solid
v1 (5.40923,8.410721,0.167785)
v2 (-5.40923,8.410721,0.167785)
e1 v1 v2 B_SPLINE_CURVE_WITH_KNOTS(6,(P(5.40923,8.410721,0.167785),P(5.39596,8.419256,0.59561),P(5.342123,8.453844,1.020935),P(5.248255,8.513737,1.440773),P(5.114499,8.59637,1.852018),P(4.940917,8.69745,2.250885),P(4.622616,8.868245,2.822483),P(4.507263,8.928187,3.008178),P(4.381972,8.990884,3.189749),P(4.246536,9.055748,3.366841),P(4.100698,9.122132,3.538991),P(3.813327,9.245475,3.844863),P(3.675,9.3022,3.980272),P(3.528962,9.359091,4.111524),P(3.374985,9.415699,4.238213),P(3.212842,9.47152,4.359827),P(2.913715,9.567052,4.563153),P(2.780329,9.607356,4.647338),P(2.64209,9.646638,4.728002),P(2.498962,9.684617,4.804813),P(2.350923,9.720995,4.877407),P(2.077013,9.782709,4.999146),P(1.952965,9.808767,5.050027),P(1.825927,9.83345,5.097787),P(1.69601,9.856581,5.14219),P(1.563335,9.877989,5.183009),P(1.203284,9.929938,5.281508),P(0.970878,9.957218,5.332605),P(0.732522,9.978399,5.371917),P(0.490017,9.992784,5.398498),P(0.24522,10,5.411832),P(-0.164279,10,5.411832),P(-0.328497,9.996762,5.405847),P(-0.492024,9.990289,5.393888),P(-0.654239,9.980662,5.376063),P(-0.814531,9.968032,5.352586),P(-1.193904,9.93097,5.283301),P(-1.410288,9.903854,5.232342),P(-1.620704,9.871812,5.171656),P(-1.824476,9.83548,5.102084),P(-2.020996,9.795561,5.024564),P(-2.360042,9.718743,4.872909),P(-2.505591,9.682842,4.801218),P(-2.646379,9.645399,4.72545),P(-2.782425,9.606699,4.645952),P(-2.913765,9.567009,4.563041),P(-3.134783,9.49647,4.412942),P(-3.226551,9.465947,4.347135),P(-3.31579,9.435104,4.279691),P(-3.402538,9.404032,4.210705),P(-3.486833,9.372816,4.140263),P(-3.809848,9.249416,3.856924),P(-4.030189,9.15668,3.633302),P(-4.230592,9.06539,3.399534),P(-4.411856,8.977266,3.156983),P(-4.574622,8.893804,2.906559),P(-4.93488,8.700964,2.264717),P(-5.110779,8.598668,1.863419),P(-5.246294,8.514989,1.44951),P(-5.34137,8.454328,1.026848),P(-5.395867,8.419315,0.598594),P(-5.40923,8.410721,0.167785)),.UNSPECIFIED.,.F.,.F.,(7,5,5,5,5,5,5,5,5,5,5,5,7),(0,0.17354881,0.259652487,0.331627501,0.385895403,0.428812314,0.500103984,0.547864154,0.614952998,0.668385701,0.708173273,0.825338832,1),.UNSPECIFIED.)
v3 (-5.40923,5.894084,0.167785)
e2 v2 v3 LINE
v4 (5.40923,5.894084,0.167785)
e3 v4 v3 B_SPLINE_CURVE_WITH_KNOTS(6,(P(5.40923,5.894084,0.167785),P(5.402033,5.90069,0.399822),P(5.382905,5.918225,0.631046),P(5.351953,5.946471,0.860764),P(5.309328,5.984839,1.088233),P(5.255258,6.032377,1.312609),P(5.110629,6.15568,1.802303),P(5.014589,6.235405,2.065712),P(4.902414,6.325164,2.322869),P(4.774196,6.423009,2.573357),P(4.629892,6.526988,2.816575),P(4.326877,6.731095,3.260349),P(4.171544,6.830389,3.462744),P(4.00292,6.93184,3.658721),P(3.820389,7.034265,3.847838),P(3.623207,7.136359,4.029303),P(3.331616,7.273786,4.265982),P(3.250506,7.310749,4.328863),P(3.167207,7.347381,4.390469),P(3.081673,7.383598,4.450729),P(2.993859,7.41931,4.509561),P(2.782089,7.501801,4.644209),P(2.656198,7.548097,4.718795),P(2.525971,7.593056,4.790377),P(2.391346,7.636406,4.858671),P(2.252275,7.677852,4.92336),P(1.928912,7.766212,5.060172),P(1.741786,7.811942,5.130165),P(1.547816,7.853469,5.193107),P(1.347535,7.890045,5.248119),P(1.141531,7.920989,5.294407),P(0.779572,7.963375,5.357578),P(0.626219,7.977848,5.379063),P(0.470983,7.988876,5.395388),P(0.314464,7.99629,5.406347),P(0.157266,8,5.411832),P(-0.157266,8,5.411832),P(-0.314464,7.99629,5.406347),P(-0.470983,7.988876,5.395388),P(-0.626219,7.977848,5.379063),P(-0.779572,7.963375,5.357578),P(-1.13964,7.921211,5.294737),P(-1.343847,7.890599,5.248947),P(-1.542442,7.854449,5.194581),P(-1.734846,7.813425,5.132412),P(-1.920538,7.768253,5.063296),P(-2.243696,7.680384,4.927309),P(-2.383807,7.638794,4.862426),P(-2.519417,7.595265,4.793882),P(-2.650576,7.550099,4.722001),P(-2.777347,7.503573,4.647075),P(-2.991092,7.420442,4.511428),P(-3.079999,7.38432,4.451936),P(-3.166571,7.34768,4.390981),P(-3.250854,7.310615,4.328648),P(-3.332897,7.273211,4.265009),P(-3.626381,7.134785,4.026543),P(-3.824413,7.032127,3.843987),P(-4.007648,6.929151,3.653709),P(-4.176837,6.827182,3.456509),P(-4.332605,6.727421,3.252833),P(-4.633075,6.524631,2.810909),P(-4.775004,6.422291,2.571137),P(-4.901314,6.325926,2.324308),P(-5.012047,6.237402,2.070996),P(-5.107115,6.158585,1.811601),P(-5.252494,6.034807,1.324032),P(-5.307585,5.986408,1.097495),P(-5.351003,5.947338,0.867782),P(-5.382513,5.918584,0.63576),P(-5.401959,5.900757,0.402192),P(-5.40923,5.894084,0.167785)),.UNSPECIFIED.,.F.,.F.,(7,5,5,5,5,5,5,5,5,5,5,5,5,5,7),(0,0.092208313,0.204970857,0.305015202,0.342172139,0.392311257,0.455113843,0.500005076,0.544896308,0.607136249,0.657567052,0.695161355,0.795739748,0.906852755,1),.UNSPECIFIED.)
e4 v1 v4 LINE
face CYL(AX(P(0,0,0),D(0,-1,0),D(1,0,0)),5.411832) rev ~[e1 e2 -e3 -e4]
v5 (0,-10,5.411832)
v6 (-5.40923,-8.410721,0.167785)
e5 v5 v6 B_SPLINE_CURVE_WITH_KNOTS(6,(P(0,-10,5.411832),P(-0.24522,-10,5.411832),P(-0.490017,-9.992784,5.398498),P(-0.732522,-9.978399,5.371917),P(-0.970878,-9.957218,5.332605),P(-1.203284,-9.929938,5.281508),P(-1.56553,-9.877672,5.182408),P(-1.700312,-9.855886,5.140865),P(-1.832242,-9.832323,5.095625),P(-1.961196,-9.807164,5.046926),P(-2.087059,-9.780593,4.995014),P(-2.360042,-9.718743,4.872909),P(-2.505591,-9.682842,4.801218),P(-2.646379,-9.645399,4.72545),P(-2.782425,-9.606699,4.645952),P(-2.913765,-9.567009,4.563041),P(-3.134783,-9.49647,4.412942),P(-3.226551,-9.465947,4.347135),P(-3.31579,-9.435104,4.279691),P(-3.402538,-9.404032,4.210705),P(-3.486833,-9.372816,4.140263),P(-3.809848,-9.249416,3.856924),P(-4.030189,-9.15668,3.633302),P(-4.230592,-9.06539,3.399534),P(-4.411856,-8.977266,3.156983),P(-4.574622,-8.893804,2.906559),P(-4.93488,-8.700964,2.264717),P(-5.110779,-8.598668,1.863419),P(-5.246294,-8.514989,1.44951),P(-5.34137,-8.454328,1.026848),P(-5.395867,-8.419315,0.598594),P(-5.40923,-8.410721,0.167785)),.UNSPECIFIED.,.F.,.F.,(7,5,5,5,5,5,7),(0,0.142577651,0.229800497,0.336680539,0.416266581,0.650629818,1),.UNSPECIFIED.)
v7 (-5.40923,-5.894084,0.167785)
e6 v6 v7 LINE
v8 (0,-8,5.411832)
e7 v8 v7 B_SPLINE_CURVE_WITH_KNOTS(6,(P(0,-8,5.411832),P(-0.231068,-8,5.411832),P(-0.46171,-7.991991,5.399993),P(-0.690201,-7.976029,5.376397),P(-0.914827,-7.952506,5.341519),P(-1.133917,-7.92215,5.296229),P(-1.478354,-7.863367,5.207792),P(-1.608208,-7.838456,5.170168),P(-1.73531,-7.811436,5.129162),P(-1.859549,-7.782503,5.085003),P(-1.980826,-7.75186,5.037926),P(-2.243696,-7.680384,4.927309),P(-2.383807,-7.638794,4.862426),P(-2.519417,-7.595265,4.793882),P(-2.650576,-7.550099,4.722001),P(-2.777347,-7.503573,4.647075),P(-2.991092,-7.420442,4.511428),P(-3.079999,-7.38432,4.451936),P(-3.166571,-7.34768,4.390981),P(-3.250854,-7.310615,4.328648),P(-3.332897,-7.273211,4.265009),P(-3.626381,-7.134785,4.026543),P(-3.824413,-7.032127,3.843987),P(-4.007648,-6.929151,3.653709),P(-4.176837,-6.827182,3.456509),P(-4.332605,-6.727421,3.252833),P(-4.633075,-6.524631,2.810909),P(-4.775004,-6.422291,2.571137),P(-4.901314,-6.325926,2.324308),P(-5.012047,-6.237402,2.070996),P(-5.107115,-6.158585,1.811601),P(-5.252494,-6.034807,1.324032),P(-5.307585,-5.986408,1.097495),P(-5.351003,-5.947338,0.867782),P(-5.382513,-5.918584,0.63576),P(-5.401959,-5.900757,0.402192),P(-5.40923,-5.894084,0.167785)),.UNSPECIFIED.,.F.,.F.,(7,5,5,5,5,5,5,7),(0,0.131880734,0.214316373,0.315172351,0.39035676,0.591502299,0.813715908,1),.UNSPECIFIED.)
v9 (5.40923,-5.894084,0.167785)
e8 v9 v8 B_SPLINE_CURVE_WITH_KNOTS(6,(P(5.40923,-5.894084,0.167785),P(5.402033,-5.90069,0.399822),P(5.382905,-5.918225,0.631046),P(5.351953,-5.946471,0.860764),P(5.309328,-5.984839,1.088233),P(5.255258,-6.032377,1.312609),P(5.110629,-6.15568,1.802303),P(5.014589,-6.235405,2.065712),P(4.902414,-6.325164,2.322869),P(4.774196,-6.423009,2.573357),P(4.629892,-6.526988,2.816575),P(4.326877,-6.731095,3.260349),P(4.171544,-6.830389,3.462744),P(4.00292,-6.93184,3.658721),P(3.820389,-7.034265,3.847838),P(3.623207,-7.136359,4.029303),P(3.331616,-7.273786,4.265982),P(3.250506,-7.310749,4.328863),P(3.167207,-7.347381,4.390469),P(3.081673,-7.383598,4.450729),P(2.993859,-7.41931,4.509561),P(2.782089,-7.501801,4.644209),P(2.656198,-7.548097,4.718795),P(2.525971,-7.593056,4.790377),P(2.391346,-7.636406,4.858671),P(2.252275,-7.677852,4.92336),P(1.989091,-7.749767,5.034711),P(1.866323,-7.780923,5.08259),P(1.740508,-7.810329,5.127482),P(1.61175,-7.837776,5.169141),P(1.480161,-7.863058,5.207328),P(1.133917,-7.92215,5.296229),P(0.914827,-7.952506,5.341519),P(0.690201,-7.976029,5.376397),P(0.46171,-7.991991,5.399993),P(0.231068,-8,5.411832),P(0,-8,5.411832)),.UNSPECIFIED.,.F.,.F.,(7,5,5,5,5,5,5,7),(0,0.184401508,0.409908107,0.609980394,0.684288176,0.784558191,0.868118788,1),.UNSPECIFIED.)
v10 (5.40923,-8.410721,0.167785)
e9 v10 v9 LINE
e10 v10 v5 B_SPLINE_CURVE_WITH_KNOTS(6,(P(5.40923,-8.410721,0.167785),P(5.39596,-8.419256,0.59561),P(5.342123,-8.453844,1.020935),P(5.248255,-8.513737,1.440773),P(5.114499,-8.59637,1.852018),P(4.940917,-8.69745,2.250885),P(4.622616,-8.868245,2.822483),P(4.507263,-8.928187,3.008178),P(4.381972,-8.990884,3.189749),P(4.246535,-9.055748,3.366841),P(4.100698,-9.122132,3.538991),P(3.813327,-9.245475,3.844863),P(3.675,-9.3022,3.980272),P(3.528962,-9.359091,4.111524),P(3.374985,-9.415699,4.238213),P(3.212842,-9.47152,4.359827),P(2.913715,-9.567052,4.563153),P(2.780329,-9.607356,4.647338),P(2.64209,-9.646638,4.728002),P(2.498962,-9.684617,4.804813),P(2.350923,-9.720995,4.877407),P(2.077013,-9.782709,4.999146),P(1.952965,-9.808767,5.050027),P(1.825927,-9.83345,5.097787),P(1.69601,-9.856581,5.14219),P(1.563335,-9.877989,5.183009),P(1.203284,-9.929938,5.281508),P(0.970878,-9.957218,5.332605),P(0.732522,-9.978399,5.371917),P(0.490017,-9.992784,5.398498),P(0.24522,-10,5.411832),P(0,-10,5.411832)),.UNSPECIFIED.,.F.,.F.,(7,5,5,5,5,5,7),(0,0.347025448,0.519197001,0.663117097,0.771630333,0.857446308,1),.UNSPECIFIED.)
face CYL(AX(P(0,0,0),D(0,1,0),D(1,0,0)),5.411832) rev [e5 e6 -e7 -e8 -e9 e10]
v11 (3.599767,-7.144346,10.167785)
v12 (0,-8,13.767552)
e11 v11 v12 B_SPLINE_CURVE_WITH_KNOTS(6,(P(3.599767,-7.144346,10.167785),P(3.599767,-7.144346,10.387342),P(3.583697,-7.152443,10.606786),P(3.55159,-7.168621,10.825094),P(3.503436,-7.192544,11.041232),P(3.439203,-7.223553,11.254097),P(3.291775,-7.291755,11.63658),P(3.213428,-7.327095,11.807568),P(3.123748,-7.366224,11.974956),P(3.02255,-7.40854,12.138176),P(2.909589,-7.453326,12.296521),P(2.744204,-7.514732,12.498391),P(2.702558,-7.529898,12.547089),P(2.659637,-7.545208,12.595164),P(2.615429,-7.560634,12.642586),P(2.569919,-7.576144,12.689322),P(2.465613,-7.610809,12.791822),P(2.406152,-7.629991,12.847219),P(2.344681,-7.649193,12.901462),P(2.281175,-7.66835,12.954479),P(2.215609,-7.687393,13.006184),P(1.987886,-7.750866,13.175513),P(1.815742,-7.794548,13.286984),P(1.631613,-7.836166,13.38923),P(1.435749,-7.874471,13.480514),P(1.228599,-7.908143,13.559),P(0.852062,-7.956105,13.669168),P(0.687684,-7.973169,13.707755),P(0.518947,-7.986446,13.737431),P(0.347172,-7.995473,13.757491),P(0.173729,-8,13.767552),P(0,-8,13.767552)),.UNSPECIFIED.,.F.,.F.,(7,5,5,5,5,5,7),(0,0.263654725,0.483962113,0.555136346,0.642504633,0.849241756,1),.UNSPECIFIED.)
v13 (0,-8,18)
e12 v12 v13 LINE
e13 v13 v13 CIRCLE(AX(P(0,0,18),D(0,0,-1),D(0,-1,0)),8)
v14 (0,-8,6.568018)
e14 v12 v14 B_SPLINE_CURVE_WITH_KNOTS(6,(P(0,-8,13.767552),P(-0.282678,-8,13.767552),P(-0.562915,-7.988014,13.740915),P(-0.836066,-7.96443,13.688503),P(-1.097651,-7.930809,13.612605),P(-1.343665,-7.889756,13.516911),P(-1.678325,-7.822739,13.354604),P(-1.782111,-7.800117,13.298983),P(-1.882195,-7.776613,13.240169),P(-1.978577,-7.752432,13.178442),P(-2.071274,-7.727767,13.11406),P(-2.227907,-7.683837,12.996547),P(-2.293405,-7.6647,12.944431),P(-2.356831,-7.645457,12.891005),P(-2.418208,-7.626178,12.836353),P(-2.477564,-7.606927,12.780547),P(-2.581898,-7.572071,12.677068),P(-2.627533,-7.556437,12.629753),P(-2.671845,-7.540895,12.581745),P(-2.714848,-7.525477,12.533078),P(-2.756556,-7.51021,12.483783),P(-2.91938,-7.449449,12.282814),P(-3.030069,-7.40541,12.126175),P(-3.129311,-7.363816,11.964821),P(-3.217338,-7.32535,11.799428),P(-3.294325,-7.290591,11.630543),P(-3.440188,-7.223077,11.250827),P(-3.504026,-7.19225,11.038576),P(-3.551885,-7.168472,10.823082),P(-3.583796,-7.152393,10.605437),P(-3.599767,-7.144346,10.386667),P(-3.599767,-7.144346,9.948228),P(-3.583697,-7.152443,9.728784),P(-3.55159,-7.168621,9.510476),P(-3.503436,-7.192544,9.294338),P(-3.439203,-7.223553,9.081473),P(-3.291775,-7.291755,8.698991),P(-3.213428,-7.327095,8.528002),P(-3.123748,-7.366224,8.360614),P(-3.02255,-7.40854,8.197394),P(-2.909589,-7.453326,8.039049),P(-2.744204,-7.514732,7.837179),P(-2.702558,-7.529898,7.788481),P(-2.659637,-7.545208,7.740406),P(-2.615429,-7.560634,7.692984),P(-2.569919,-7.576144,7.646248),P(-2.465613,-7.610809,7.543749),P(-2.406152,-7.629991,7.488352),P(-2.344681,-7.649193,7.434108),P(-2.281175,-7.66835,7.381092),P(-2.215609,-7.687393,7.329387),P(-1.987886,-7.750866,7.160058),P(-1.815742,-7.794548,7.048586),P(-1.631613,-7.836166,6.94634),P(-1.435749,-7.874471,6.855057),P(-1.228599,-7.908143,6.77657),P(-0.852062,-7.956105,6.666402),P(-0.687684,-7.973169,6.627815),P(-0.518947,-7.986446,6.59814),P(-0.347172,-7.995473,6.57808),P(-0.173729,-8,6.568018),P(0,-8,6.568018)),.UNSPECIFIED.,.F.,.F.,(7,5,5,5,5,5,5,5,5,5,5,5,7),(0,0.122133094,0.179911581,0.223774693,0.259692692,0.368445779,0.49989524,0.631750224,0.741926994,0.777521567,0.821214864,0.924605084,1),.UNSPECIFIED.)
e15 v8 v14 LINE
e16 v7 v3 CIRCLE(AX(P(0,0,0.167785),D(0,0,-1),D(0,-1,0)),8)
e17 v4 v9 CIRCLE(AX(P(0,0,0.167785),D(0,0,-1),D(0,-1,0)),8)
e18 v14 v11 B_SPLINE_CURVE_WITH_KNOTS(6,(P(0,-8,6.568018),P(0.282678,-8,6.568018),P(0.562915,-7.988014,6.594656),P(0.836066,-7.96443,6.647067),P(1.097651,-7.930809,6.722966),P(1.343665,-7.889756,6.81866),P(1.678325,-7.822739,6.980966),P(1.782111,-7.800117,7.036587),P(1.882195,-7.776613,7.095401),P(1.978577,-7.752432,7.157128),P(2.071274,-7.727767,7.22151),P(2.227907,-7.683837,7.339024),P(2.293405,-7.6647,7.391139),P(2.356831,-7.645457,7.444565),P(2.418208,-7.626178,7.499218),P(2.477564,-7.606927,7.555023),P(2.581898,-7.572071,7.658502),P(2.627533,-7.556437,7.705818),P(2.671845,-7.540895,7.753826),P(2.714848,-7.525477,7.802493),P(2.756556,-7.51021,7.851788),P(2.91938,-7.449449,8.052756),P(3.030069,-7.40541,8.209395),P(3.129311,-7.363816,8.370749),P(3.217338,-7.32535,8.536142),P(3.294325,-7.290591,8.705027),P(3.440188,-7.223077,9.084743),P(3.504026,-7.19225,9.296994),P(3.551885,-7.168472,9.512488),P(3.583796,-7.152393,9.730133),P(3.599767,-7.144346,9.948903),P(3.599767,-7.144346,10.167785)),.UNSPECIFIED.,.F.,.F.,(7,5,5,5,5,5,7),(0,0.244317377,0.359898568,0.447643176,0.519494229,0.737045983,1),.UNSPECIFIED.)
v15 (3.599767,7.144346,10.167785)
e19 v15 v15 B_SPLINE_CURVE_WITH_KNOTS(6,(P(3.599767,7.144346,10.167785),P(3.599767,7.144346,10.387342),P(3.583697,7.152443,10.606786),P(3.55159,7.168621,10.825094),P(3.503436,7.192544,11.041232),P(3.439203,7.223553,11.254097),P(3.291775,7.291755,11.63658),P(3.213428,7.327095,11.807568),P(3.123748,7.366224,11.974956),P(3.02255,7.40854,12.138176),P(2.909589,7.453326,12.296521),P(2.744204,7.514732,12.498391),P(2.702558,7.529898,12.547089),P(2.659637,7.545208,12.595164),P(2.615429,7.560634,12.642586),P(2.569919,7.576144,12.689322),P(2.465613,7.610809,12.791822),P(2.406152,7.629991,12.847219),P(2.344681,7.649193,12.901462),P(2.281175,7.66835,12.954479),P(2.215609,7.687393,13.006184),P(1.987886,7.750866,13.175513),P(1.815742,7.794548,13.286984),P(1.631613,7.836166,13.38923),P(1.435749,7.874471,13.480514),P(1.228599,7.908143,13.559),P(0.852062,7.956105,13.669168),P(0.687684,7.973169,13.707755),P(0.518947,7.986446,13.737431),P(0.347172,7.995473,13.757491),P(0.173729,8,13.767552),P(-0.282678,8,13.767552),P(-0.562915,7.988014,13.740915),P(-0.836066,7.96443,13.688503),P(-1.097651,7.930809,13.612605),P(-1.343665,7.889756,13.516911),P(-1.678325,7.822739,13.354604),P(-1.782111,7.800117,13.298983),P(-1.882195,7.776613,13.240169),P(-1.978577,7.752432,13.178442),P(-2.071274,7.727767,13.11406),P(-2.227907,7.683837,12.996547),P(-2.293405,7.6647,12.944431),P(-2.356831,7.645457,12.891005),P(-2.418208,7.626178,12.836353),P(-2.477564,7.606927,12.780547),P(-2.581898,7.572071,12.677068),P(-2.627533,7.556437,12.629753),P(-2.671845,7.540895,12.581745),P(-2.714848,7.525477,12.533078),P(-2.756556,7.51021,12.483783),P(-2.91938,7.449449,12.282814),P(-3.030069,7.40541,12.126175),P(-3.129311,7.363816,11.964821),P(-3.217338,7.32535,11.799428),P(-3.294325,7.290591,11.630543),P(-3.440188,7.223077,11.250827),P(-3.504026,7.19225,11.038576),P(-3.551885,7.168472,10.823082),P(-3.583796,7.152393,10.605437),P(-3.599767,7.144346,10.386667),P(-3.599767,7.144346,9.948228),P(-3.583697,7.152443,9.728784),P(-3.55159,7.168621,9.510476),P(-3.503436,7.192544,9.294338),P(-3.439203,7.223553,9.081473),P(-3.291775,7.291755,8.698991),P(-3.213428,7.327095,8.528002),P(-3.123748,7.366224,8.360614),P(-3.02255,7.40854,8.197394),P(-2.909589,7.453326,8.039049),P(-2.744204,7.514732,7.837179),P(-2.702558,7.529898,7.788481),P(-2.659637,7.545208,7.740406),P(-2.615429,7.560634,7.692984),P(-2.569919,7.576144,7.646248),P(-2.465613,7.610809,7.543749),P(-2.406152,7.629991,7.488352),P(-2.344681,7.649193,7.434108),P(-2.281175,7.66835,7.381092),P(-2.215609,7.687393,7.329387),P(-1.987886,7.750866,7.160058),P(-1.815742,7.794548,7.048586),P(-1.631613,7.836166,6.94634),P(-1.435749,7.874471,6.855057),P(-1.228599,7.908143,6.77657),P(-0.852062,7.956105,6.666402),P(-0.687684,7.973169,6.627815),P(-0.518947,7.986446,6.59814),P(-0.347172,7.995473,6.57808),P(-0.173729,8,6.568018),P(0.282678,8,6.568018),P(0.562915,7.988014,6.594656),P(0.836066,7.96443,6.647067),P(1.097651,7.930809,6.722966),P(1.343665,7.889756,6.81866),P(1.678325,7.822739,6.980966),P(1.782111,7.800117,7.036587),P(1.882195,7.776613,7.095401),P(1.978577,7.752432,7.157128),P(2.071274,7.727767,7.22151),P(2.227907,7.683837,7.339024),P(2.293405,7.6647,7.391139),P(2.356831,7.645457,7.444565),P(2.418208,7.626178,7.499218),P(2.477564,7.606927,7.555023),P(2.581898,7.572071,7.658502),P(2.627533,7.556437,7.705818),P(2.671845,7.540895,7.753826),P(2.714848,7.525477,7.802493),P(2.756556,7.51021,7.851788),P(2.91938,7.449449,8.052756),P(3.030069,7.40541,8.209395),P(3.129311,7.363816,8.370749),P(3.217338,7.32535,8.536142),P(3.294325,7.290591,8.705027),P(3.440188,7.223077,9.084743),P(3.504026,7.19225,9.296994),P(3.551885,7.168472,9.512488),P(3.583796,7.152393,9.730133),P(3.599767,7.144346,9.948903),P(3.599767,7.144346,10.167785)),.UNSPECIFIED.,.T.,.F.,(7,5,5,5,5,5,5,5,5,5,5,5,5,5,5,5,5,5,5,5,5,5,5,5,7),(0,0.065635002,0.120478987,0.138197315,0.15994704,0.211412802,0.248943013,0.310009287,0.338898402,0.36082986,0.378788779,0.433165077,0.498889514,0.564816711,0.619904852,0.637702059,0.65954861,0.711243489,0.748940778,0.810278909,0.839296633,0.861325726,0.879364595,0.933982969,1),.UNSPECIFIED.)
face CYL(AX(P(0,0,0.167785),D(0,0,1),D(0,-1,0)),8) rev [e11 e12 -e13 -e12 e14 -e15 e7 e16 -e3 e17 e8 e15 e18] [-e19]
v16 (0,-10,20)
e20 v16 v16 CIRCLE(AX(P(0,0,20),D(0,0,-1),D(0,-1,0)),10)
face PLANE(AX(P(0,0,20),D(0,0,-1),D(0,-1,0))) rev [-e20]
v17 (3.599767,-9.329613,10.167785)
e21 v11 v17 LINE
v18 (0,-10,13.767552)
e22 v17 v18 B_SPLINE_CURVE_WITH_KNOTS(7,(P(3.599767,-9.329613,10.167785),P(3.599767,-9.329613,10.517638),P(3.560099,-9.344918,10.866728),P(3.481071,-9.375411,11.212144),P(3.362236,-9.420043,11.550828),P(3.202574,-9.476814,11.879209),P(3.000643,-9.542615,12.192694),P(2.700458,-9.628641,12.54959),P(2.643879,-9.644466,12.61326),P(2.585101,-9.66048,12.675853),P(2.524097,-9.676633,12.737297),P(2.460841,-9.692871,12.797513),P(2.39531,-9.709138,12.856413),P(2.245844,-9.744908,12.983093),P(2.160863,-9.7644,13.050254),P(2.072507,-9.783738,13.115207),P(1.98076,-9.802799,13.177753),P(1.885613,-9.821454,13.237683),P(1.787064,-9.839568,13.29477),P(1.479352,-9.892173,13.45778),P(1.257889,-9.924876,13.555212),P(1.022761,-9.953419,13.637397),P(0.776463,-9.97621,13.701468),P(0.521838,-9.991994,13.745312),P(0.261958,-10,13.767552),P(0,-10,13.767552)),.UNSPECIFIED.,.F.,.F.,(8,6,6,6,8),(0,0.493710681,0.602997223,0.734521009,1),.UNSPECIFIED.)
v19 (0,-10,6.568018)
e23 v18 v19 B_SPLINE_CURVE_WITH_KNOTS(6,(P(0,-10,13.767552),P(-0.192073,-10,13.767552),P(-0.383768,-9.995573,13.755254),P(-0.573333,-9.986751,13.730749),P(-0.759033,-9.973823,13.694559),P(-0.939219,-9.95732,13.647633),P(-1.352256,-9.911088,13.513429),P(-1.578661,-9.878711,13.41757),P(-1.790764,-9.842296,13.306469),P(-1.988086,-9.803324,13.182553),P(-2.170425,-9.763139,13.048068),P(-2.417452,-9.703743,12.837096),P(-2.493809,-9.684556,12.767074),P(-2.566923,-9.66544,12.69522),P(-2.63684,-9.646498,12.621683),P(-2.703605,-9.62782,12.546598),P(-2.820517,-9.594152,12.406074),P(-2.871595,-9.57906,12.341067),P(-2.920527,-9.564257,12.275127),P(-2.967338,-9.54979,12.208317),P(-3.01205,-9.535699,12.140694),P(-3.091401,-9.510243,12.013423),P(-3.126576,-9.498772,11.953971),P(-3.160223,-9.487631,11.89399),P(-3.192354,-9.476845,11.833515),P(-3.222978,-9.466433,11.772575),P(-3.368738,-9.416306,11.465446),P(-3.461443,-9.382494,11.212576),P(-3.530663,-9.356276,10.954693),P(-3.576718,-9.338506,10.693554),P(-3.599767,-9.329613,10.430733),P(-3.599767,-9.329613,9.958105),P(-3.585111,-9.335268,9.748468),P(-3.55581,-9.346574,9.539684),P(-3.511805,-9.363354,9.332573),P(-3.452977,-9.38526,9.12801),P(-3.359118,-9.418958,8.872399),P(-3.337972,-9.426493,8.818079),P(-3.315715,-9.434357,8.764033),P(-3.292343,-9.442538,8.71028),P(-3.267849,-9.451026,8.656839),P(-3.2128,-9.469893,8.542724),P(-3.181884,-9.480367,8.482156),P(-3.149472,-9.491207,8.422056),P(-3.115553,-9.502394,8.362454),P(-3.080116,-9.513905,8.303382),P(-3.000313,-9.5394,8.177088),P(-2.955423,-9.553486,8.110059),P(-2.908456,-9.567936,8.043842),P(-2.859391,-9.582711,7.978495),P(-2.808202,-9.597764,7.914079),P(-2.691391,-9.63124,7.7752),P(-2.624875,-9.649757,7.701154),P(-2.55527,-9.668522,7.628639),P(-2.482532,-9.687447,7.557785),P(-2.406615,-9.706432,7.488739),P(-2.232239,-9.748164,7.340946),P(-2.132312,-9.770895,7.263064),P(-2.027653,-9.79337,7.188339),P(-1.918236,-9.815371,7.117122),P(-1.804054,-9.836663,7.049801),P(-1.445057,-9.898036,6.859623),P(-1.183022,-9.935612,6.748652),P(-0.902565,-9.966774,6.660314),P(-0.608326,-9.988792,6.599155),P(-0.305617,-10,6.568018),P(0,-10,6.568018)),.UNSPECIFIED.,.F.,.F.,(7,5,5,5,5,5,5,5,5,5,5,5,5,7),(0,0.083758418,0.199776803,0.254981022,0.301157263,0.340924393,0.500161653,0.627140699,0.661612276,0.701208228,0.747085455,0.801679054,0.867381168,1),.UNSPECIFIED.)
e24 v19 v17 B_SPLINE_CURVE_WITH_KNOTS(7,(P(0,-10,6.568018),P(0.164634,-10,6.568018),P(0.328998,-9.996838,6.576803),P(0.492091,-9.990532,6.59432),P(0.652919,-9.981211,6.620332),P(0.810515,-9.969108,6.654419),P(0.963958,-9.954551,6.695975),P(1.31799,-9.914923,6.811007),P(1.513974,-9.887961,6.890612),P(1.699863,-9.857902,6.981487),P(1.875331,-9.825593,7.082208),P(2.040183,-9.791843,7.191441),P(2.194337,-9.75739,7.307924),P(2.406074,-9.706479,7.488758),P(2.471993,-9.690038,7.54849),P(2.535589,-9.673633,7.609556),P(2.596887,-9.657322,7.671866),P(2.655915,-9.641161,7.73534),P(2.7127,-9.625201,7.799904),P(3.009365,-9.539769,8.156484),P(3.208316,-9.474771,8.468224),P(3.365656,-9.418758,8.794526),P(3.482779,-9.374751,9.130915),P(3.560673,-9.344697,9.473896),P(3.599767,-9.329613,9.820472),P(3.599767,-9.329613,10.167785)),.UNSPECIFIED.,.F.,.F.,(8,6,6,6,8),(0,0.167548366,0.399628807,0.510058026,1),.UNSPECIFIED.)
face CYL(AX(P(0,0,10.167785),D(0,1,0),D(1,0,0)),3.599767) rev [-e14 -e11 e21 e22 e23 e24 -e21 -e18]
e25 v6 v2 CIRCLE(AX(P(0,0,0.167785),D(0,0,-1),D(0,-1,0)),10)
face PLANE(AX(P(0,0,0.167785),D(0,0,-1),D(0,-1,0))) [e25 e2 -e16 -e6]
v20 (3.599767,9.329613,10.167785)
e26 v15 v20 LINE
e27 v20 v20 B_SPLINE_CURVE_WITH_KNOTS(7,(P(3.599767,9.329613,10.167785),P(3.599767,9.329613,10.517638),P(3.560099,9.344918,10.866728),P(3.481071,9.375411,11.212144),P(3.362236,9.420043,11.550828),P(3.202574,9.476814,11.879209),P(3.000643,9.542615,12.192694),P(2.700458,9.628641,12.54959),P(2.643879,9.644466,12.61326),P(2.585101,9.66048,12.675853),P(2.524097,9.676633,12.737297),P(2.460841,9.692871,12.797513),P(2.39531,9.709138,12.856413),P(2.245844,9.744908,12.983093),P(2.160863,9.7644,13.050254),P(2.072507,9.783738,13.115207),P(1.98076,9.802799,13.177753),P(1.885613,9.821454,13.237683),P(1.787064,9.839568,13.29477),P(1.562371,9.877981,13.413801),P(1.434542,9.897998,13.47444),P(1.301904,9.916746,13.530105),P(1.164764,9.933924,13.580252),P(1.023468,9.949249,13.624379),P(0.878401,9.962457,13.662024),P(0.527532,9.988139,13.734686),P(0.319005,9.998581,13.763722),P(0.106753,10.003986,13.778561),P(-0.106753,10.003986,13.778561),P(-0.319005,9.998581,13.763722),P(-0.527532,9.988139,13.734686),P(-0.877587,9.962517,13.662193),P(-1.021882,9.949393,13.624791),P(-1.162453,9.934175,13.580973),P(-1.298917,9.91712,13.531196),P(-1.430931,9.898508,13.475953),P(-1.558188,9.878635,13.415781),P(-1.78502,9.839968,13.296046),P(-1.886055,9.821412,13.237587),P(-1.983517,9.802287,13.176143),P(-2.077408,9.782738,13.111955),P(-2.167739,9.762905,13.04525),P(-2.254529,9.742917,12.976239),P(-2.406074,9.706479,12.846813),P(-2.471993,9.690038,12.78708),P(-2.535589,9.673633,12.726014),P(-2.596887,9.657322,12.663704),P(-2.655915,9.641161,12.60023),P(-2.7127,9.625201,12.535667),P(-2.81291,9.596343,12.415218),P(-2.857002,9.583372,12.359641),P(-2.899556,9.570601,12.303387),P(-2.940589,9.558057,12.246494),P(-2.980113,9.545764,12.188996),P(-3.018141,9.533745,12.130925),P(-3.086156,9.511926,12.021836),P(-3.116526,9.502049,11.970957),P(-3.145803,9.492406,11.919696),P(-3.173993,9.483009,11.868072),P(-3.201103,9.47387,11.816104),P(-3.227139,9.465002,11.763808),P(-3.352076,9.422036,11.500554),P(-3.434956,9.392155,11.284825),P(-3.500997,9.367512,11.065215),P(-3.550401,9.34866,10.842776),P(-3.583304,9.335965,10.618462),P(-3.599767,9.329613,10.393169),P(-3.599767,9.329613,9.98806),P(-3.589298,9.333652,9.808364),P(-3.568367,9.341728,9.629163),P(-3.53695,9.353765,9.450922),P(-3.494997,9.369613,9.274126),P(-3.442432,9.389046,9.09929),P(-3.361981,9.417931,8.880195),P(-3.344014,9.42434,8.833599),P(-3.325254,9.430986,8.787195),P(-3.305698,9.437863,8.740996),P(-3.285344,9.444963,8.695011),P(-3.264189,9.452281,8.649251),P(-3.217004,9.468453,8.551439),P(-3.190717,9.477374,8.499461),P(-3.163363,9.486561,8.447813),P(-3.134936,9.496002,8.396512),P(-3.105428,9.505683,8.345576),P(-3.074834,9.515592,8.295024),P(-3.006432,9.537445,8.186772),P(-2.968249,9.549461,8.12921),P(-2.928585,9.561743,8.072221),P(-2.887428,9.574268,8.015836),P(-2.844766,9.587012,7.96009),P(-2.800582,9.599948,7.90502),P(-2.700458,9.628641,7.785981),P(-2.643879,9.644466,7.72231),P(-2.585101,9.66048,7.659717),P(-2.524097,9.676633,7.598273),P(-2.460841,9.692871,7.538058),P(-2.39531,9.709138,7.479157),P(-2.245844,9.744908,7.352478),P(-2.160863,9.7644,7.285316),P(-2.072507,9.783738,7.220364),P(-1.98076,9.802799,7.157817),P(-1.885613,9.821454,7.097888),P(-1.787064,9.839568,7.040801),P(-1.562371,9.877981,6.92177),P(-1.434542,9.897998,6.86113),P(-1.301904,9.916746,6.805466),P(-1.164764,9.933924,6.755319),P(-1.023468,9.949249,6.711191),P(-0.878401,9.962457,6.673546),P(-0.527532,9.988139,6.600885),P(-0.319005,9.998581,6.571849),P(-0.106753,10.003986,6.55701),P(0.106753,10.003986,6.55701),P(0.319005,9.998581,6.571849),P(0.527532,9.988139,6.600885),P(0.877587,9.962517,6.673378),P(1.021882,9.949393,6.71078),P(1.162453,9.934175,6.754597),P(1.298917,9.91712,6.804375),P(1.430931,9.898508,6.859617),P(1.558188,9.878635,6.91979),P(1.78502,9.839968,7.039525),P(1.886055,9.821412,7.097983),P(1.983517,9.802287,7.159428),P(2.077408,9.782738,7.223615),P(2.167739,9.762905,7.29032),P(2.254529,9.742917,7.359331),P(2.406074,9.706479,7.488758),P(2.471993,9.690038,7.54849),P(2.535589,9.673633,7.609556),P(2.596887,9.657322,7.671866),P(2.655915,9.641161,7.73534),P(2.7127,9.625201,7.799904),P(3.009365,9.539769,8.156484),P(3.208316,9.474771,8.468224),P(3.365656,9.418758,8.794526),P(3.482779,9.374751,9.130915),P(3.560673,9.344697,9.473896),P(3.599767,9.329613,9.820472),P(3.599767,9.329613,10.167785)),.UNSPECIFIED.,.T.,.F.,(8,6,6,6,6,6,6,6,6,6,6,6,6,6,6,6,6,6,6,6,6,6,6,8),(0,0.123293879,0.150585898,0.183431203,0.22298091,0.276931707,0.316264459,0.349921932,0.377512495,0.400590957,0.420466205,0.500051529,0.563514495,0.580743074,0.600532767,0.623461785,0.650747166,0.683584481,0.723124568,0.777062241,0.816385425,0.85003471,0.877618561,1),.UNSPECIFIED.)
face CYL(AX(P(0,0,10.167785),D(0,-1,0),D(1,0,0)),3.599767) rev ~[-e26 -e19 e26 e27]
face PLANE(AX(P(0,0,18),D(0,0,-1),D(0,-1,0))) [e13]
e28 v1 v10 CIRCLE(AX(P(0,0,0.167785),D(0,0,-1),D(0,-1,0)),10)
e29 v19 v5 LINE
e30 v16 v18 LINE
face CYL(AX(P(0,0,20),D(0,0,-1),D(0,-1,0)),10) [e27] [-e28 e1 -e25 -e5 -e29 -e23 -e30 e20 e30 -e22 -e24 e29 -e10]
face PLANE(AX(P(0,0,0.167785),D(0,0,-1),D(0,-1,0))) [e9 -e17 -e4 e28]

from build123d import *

# Parameters (mm, degrees)
F3_R          = 3.599766951
F4_DEPTH      = 10.001
F4_DEPTH_BACK = 10.001
F6_DEPTH      = 10.0010001
F6_DEPTH_BACK = 10.0010001


with BuildPart() as f2:
    # F0 (on Right) → F2 (revolve)
    with BuildSketch(Plane.YZ):
        Polygon((0, 18), (0, 20), (-10, 20), (-10, 0.1677852448), (-8, 0.1677852448), (-8, 18), align=None)
    revolve(axis=Axis((0, 0, 9.9367983639), (0, 0, -1)))

    # F3 (on Front) → F4 (cut, two sides)
    with BuildSketch(Plane.XZ) as f4_sk:
        with Locations((0, 10.1677852448)):
            Circle(F3_R)
    extrude(amount=-F4_DEPTH, mode=Mode.SUBTRACT)
    extrude(f4_sk.sketch, amount=F4_DEPTH_BACK, mode=Mode.SUBTRACT)

    # F5 (on Front) → F6 (cut, two sides)
    with BuildSketch(Plane.XZ) as f6_sk:
        with BuildLine():
            Line((-5.4118316221, 0), (5.4118316221, 0))
            ThreePointArc((5.4118316221, 0), (0, 5.4118316221), (-5.4118316221, 0))
        make_face()
    extrude(amount=-F6_DEPTH, mode=Mode.SUBTRACT)
    extrude(f6_sk.sketch, amount=F6_DEPTH_BACK, mode=Mode.SUBTRACT)


solid = f2.part
